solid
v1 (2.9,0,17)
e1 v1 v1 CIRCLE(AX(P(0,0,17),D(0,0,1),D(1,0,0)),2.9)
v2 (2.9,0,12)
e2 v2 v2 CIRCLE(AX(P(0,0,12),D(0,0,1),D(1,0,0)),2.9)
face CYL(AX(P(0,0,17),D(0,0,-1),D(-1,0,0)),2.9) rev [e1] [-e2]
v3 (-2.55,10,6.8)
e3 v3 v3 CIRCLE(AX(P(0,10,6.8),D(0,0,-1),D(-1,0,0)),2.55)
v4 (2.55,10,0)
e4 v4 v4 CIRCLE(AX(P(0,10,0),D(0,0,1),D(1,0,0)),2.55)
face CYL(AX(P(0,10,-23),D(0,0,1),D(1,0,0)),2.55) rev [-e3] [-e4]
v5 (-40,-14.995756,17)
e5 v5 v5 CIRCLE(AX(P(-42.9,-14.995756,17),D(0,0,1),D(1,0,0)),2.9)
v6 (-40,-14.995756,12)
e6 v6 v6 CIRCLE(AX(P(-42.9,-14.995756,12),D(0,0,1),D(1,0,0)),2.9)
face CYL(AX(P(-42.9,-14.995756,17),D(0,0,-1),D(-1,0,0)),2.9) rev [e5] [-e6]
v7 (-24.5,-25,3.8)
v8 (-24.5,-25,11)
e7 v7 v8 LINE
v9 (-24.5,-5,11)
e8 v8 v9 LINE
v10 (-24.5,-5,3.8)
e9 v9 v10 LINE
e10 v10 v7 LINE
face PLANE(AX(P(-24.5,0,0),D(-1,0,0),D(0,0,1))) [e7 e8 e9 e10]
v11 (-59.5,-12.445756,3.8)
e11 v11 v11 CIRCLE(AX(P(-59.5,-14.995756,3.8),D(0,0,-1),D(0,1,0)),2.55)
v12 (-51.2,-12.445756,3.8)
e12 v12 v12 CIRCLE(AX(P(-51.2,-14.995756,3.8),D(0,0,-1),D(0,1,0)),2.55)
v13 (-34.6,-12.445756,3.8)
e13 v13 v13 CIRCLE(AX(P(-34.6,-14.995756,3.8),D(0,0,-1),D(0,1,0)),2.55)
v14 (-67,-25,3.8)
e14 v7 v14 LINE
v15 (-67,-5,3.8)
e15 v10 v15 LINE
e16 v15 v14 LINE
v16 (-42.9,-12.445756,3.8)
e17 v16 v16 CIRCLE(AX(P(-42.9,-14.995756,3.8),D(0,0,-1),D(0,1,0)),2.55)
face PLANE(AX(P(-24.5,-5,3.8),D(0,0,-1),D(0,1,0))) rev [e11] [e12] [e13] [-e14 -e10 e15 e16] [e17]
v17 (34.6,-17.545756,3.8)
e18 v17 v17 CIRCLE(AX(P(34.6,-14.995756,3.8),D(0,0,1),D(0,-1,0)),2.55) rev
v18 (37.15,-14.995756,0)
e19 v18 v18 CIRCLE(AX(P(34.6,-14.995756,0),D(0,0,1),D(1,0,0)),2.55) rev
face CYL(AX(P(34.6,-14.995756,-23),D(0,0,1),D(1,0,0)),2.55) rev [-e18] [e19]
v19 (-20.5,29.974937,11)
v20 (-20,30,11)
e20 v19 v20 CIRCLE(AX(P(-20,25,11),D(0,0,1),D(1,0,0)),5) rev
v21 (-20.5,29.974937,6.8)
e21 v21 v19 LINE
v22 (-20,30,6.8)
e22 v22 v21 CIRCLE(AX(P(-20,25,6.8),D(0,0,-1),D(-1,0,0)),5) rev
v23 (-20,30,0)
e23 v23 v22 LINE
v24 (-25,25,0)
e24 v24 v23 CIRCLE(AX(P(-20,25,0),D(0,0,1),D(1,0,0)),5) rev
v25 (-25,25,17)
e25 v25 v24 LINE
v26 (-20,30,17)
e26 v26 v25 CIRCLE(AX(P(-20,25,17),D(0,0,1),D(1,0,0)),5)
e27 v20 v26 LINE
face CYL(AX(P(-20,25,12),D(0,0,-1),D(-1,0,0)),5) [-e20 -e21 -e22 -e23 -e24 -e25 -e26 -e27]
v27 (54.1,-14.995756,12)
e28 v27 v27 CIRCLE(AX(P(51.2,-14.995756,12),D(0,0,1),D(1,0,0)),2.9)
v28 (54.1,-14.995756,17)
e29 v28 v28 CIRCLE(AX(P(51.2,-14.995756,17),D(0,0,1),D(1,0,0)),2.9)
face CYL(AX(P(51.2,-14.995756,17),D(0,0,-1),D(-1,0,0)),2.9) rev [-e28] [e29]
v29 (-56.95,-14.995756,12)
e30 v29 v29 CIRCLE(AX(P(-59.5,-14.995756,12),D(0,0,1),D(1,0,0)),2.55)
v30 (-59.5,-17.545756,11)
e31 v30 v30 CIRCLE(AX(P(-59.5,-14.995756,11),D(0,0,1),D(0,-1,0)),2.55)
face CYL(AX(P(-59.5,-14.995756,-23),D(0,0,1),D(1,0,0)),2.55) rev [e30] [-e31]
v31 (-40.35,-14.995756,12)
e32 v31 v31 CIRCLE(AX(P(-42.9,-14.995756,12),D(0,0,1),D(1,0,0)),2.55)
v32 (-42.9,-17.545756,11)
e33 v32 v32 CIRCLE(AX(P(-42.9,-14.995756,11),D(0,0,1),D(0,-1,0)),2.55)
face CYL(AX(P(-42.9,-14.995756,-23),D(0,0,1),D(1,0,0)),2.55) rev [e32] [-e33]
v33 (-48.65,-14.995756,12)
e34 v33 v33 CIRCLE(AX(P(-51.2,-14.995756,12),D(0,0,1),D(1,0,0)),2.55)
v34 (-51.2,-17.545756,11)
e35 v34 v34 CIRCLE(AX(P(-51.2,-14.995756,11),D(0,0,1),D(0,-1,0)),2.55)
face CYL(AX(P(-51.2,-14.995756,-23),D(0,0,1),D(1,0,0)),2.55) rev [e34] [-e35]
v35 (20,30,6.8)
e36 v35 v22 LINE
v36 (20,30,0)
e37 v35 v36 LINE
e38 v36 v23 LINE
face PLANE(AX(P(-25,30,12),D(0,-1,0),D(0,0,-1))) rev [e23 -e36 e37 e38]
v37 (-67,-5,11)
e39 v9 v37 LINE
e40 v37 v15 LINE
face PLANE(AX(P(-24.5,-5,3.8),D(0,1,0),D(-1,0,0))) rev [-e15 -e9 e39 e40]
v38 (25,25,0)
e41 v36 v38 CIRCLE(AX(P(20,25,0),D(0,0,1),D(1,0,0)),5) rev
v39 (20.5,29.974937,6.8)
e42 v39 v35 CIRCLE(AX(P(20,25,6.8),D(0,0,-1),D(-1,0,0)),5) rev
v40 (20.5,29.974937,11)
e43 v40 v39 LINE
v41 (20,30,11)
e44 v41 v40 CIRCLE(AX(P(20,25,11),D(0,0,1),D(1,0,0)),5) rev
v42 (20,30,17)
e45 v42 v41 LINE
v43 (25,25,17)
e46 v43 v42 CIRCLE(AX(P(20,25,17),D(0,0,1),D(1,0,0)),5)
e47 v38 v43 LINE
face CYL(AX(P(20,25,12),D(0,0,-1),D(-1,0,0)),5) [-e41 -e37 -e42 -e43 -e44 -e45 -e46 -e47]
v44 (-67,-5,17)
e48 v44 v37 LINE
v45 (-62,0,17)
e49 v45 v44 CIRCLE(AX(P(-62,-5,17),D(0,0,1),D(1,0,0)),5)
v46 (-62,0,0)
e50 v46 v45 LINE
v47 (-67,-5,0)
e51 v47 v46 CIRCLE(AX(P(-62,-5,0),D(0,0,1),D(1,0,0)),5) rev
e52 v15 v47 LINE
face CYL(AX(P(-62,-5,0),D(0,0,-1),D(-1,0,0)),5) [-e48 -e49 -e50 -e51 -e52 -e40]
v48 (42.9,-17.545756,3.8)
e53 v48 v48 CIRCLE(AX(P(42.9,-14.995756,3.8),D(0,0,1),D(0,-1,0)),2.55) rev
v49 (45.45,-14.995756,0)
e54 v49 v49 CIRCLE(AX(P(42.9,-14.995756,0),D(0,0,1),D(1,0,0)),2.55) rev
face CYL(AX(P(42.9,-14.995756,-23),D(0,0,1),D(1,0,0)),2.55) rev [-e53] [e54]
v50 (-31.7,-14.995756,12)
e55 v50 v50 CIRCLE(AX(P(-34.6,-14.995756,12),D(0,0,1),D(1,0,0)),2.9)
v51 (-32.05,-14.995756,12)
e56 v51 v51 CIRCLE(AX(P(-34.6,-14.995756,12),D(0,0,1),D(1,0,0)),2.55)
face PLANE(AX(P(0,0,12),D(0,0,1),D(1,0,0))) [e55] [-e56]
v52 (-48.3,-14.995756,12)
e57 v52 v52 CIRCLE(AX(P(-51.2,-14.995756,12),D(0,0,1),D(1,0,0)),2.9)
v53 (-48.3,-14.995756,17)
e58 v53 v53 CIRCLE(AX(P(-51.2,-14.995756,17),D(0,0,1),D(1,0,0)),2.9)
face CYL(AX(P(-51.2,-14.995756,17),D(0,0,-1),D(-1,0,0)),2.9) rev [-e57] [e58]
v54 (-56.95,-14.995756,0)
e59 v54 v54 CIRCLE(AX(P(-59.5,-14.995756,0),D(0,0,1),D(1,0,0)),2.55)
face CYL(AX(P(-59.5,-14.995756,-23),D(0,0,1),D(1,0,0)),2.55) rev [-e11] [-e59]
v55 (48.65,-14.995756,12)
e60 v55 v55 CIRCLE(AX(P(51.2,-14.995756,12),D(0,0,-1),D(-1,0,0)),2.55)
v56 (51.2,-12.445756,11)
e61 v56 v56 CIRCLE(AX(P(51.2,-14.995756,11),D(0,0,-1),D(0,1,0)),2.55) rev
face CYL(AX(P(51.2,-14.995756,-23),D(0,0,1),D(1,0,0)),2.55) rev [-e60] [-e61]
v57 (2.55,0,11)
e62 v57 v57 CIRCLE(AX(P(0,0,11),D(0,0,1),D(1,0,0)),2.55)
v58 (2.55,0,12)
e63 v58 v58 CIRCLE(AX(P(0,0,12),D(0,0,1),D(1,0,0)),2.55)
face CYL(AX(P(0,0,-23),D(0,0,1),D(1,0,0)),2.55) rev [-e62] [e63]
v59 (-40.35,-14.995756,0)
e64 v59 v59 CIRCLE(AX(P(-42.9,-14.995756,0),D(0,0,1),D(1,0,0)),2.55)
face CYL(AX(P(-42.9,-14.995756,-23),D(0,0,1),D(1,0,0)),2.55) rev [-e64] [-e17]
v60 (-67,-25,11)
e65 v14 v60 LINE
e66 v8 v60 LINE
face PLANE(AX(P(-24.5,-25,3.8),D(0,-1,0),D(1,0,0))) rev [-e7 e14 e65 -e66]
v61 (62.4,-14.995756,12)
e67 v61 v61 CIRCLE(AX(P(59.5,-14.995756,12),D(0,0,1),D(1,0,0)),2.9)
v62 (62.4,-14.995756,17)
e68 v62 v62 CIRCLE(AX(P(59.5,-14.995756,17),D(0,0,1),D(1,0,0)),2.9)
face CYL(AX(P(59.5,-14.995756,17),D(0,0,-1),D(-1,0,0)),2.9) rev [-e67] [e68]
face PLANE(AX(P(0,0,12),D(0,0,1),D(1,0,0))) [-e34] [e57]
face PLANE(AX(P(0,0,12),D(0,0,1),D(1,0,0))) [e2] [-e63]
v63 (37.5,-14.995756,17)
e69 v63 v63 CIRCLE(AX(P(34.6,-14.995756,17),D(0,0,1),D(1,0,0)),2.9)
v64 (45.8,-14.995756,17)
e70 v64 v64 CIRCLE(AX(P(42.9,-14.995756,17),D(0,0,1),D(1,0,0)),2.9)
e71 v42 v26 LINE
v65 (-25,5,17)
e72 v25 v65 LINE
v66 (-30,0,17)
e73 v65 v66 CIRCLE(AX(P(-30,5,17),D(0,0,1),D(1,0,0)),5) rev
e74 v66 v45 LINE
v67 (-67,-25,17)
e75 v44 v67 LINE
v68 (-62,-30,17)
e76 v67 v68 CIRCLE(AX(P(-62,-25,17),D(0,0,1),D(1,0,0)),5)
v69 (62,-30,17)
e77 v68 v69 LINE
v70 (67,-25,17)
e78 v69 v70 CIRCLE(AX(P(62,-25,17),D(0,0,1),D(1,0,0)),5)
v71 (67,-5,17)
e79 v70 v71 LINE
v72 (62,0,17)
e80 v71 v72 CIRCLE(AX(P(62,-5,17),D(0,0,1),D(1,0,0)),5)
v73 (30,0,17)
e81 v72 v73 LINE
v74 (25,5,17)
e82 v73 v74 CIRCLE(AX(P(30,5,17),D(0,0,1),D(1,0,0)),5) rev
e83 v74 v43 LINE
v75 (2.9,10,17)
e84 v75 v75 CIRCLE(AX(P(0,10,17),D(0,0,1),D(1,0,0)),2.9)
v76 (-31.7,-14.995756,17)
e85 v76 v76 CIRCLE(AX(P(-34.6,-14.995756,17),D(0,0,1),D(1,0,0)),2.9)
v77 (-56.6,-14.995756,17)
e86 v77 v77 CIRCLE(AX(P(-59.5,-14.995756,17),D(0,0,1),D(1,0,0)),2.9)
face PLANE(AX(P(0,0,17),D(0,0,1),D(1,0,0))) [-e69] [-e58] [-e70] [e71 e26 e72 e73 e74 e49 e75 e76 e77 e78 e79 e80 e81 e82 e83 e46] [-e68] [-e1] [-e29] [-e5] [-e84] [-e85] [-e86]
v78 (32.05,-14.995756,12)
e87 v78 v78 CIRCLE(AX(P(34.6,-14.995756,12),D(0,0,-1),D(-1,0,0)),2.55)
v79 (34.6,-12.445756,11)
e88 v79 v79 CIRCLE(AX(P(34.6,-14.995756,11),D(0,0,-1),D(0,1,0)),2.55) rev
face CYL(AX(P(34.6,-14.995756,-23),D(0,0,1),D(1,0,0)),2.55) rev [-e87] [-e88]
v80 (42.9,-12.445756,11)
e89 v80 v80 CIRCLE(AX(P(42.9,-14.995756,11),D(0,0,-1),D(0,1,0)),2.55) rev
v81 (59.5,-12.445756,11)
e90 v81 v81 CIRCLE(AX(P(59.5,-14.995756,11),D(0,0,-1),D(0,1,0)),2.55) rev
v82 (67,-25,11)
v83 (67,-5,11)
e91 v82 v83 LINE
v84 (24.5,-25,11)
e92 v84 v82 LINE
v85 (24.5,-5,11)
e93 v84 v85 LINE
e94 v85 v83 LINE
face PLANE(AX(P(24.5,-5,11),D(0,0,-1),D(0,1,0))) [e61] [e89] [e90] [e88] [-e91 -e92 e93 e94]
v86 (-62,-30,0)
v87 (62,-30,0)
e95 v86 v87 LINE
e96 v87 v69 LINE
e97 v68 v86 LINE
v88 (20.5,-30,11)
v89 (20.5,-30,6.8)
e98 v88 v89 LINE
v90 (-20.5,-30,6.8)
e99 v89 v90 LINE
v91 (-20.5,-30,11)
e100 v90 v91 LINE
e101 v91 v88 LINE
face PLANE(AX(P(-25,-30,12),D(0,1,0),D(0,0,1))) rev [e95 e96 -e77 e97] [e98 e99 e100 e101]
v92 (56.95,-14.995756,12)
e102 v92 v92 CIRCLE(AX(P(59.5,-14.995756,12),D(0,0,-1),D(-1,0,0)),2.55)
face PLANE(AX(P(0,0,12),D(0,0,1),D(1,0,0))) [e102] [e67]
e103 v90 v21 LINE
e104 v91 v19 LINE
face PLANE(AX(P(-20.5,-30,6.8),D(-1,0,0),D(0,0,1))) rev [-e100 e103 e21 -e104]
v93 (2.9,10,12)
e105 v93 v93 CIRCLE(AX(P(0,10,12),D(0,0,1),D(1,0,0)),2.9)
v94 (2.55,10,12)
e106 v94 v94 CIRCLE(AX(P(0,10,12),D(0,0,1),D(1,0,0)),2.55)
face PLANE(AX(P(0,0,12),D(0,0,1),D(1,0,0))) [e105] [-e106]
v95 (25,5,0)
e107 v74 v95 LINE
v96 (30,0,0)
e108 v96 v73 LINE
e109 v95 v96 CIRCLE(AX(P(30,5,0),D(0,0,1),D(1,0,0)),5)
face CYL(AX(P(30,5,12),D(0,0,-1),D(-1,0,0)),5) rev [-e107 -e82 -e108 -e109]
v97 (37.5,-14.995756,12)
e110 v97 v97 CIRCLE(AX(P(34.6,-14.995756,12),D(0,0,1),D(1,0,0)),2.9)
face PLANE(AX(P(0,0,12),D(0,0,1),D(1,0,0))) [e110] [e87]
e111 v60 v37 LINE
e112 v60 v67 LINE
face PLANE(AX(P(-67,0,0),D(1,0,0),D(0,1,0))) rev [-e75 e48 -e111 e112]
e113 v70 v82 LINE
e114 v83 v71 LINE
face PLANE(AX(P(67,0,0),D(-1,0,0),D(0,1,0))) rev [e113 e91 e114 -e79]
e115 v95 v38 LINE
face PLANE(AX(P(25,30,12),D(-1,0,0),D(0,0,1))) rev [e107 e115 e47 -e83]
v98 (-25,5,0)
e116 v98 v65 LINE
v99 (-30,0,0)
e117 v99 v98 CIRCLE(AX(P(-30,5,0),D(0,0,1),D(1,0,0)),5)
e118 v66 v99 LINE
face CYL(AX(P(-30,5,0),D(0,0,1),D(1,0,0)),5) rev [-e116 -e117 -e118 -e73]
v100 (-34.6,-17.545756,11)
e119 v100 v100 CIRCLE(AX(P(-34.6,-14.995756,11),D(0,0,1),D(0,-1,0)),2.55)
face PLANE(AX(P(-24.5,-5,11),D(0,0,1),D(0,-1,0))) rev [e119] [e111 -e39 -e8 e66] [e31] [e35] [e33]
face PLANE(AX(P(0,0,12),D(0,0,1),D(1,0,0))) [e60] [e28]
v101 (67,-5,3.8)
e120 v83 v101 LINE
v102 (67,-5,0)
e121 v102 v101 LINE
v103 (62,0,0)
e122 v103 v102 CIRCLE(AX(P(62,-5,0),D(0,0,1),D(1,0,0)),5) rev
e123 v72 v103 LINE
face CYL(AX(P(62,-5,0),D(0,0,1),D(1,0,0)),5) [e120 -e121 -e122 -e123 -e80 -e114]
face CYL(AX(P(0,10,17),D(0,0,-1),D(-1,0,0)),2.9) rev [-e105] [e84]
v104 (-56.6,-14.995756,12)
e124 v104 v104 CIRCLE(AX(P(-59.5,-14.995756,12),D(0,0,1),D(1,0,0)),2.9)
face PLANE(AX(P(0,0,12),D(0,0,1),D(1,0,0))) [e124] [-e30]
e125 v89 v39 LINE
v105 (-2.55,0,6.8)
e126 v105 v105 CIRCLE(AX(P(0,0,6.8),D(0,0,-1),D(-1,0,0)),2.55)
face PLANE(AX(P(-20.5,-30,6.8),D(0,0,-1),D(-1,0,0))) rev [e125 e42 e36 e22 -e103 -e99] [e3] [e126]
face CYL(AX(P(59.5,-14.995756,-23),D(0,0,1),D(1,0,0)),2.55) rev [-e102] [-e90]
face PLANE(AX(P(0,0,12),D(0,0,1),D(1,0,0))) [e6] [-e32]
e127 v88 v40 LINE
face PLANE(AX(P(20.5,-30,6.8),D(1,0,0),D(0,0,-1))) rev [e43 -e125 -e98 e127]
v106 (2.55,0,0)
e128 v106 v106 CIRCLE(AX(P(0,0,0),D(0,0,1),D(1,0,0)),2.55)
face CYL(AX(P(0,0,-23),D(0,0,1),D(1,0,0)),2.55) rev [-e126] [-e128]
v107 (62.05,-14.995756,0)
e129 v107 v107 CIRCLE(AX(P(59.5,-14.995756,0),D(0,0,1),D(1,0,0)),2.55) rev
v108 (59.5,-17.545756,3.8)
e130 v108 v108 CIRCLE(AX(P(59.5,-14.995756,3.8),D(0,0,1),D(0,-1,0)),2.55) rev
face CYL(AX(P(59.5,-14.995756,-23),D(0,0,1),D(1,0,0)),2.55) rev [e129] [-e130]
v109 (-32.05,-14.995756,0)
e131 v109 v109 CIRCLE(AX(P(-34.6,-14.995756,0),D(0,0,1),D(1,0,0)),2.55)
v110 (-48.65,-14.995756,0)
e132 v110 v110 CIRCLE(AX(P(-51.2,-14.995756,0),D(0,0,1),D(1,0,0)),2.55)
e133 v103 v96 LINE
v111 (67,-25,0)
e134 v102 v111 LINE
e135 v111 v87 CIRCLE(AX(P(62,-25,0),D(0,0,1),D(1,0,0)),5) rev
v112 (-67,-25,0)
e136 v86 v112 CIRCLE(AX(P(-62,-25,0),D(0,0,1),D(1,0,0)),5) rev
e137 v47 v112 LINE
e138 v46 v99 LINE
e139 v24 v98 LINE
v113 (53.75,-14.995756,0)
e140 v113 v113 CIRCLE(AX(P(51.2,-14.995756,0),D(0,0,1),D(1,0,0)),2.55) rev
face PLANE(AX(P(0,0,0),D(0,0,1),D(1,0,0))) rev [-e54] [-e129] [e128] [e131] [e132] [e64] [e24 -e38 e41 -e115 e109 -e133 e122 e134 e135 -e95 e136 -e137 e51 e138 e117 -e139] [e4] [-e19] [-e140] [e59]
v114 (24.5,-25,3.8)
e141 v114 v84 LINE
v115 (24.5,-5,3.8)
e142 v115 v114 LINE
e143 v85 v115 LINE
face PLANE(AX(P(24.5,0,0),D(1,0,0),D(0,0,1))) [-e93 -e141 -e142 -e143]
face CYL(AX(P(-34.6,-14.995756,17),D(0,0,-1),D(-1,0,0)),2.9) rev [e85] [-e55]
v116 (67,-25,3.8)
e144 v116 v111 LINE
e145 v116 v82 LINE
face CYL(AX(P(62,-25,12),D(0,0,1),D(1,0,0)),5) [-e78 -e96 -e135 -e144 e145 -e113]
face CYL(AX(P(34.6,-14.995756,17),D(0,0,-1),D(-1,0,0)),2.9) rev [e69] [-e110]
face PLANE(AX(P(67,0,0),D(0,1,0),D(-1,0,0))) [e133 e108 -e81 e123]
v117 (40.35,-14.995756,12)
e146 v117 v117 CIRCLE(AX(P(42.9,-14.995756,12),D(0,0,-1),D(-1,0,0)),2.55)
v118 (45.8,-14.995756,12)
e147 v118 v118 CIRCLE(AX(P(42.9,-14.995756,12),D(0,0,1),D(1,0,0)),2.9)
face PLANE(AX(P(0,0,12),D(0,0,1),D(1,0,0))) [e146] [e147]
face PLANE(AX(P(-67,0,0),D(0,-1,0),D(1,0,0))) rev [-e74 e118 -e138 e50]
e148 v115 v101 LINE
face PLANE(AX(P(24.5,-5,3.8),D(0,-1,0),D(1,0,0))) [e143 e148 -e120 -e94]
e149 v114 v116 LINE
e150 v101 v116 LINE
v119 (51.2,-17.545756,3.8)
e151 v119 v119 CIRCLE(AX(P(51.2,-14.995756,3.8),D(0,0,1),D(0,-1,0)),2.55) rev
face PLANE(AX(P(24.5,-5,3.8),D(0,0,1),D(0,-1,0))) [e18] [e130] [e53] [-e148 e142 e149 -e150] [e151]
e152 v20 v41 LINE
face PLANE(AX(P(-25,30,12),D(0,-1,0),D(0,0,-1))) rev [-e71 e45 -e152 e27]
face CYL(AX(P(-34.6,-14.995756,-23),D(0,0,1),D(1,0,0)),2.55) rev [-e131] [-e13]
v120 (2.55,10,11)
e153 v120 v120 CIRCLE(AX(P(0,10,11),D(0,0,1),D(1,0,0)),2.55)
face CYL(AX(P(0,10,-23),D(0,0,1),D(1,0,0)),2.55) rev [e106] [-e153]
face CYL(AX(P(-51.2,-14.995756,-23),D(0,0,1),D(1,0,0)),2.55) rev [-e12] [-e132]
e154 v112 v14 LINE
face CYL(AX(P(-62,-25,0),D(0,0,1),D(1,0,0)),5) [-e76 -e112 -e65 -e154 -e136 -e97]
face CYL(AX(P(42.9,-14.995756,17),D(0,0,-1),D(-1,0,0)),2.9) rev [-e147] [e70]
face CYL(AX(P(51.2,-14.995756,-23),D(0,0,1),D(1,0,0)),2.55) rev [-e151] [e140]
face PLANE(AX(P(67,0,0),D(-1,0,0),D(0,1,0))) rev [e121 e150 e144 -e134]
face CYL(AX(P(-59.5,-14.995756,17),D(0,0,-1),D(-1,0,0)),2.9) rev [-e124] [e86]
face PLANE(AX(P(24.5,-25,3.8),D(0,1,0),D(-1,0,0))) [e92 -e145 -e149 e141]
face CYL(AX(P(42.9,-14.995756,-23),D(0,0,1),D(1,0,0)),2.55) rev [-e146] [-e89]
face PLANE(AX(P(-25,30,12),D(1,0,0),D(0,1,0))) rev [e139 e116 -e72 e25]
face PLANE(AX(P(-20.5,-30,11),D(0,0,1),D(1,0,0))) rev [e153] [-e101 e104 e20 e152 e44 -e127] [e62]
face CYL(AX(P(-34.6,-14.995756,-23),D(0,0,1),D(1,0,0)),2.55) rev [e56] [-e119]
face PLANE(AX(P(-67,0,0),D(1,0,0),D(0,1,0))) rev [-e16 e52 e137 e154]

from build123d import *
from build123d.topology import SkipClean

# Parameters (mm, degrees)
SKETCH1_W           = 50
SKETCH1_H           = 60
BOSS_EXTRUDE1_DEPTH = 12
SKETCH2_W           = 41
SKETCH2_H           = 4.2
CUT_EXTRUDE1_DEPTH  = 67.098411479
SKETCH3_W           = 12
SKETCH3_H           = 30
BOSS_EXTRUDE2_DEPTH = 42
SKETCH4_W           = 7.2
SKETCH4_H           = 20
CUT_EXTRUDE2_DEPTH  = 42.5
SKETCH5_R           = 2.55
CUT_EXTRUDE3_DEPTH  = 35
FILLET1_R           = 5
SKETCH6_R           = 2.55
CUT_EXTRUDE4_DEPTH  = 35
SKETCH7_R           = 2.9
BOSS_EXTRUDE3_DEPTH = 5


with BuildPart() as part:
    # Sketch1 → Boss-Extrude1 (new body)
    with BuildSketch(Plane.XY):
        Rectangle(SKETCH1_W, SKETCH1_H)
    extrude(amount=BOSS_EXTRUDE1_DEPTH)

    # Sketch2 → Cut-Extrude1 (cut, through all)
    with BuildSketch(Plane(origin=(0, 30, 0), x_dir=(1, 0, 0), z_dir=(0, 1, 0))):
        with Locations((0, -8.9)):
            Rectangle(SKETCH2_W, SKETCH2_H)
    extrude(amount=-CUT_EXTRUDE1_DEPTH, mode=Mode.SUBTRACT)

    # Sketch3 → Boss-Extrude2 (add)
    with BuildSketch(Plane.ZY.offset(25)):
        with Locations((6, -15)):
            Rectangle(SKETCH3_W, SKETCH3_H)
    boss_extrude2 = extrude(amount=BOSS_EXTRUDE2_DEPTH)

    # Sketch4 → Cut-Extrude2 (cut)
    with BuildSketch(Plane.ZY.offset(67)):
        with Locations((7.4, -15)):
            Rectangle(SKETCH4_W, SKETCH4_H)
    cut_extrude2 = extrude(amount=-CUT_EXTRUDE2_DEPTH, mode=Mode.SUBTRACT)

    # Sketch5 → Cut-Extrude3 (cut)
    with BuildSketch(Plane.XY.offset(12)):
        with Locations((-59.5, -14.995756269)):
            Circle(SKETCH5_R)
        with Locations((-51.2, -14.995756269)):
            Circle(SKETCH5_R)
        with Locations((-42.9, -14.995756269)):
            Circle(SKETCH5_R)
        with Locations((-34.6, -14.995756269)):
            Circle(SKETCH5_R)
    cut_extrude3 = extrude(amount=-CUT_EXTRUDE3_DEPTH, mode=Mode.SUBTRACT)

    # Mirror1: Boss-Extrude2, Cut-Extrude2, Cut-Extrude3 across plane
    add(boss_extrude2.mirror(Plane(origin=(0, 0, 0), x_dir=(0, 0, 1), z_dir=(1, 0, 0))))
    add(cut_extrude2.mirror(Plane(origin=(0, 0, 0), x_dir=(0, 0, 1), z_dir=(1, 0, 0))), mode=Mode.SUBTRACT)
    add(cut_extrude3.mirror(Plane(origin=(0, 0, 0), x_dir=(0, 0, 1), z_dir=(1, 0, 0))), mode=Mode.SUBTRACT)

    # Fillet1
    # the kernel refuses this fillet: 5 mm, written as the material it adds along each edge
    with BuildSketch(Plane(origin=(25, 0, 12), x_dir=(0, 1, 0), z_dir=(0, 0, -1))) as fillet1_piece_1:
        with BuildLine():
            CenterArc((FILLET1_R, FILLET1_R), FILLET1_R, 180, 90)
            Line((0, FILLET1_R), (0, 0))
            Line((0, 0), (FILLET1_R, 0))
        make_face()
    extrude(amount=12)
    with BuildSketch(Plane(origin=(-25, 0, 12), x_dir=(0, 1, 0), z_dir=(0, 0, -1))) as fillet1_piece_2:
        with BuildLine():
            CenterArc((FILLET1_R, -FILLET1_R), FILLET1_R, 90, 90)
            Line((0, -FILLET1_R), (0, 0))
            Line((0, 0), (FILLET1_R, 0))
        make_face()
    extrude(amount=12)
    # the kernel refuses this fillet: 5 mm, written as the material it takes off along each edge
    with BuildSketch(Plane(origin=(67, -30, -12.5), x_dir=(0, 1, 0), z_dir=(0, 0, 1)), Plane(origin=(-67, 0, 24.5), x_dir=(1, 0, 0), z_dir=(0, 0, -1)), Plane(origin=(25, 30, -12.5), x_dir=(-1, 0, 0), z_dir=(0, 0, 1))) as fillet1_2_piece_1:
        with BuildLine():
            CenterArc((FILLET1_R, FILLET1_R), FILLET1_R, 180, 90)
            Line((0, FILLET1_R), (0, 0))
            Line((0, 0), (FILLET1_R, 0))
        make_face()
    extrude(amount=37, mode=Mode.SUBTRACT)
    with BuildSketch(Plane(origin=(67, 0, 24.5), x_dir=(-1, 0, 0), z_dir=(0, 0, -1)), Plane(origin=(-67, -30, -12.5), x_dir=(0, 1, 0), z_dir=(0, 0, 1)), Plane(origin=(-25, 30, -12.5), x_dir=(1, 0, 0), z_dir=(0, 0, 1))) as fillet1_2_piece_2:
        with BuildLine():
            CenterArc((FILLET1_R, -FILLET1_R), FILLET1_R, 90, 90)
            Line((0, -FILLET1_R), (0, 0))
            Line((0, 0), (FILLET1_R, 0))
        make_face()
    extrude(amount=37, mode=Mode.SUBTRACT)

    # Sketch6 → Cut-Extrude4 (cut)
    with BuildSketch(Plane.XY.offset(12)):
        Circle(SKETCH6_R)
        with Locations((0, 10)):
            Circle(SKETCH6_R)
    extrude(amount=-CUT_EXTRUDE4_DEPTH, mode=Mode.SUBTRACT)

    # Sketch7 → Boss-Extrude3 (add)
    with SkipClean():  # the faces are left unmerged after this step: merging them gives an invalid solid
        with BuildSketch(Plane.XY.offset(12)):
            with BuildLine():
                ThreePointArc((-67, -25), (-65.535533906, -28.535533906), (-62, -30))
                Line((-62, -30), (62, -30))
                ThreePointArc((62, -30), (65.535533906, -28.535533906), (67, -25))
                Line((67, -25), (67, -5))
                ThreePointArc((67, -5), (65.535533906, -1.464466094), (62, 0))
                Line((62, 0), (30, 0))
                ThreePointArc((30, 0), (26.464466094, 1.464466094), (25, 5))
                Line((25, 5), (25, 25))
                ThreePointArc((25, 25), (23.535533906, 28.535533906), (20, 30))
                Line((20, 30), (-20, 30))
                ThreePointArc((-20, 30), (-23.535533906, 28.535533906), (-25, 25))
                Line((-25, 25), (-25, 5))
                ThreePointArc((-25, 5), (-26.464466094, 1.464466094), (-30, 0))
                Line((-30, 0), (-62, 0))
                ThreePointArc((-62, 0), (-65.535533906, -1.464466094), (-67, -5))
                Line((-67, -5), (-67, -25))
            make_face()
            with Locations((-59.5, -14.995756269)):
                Circle(SKETCH7_R, mode=Mode.SUBTRACT)
            with Locations((-51.2, -14.995756269)):
                Circle(SKETCH7_R, mode=Mode.SUBTRACT)
            with Locations((-42.9, -14.995756269)):
                Circle(SKETCH7_R, mode=Mode.SUBTRACT)
            with Locations((-34.6, -14.995756269)):
                Circle(SKETCH7_R, mode=Mode.SUBTRACT)
            with Locations((59.5, -14.995756269)):
                Circle(SKETCH7_R, mode=Mode.SUBTRACT)
            with Locations((51.2, -14.995756269)):
                Circle(SKETCH7_R, mode=Mode.SUBTRACT)
            with Locations((42.9, -14.995756269)):
                Circle(SKETCH7_R, mode=Mode.SUBTRACT)
            with Locations((34.6, -14.995756269)):
                Circle(SKETCH7_R, mode=Mode.SUBTRACT)
            with Locations((0, 10)):
                Circle(SKETCH7_R, mode=Mode.SUBTRACT)
            Circle(SKETCH7_R, mode=Mode.SUBTRACT)
        extrude(amount=BOSS_EXTRUDE3_DEPTH)


solid = part.part
